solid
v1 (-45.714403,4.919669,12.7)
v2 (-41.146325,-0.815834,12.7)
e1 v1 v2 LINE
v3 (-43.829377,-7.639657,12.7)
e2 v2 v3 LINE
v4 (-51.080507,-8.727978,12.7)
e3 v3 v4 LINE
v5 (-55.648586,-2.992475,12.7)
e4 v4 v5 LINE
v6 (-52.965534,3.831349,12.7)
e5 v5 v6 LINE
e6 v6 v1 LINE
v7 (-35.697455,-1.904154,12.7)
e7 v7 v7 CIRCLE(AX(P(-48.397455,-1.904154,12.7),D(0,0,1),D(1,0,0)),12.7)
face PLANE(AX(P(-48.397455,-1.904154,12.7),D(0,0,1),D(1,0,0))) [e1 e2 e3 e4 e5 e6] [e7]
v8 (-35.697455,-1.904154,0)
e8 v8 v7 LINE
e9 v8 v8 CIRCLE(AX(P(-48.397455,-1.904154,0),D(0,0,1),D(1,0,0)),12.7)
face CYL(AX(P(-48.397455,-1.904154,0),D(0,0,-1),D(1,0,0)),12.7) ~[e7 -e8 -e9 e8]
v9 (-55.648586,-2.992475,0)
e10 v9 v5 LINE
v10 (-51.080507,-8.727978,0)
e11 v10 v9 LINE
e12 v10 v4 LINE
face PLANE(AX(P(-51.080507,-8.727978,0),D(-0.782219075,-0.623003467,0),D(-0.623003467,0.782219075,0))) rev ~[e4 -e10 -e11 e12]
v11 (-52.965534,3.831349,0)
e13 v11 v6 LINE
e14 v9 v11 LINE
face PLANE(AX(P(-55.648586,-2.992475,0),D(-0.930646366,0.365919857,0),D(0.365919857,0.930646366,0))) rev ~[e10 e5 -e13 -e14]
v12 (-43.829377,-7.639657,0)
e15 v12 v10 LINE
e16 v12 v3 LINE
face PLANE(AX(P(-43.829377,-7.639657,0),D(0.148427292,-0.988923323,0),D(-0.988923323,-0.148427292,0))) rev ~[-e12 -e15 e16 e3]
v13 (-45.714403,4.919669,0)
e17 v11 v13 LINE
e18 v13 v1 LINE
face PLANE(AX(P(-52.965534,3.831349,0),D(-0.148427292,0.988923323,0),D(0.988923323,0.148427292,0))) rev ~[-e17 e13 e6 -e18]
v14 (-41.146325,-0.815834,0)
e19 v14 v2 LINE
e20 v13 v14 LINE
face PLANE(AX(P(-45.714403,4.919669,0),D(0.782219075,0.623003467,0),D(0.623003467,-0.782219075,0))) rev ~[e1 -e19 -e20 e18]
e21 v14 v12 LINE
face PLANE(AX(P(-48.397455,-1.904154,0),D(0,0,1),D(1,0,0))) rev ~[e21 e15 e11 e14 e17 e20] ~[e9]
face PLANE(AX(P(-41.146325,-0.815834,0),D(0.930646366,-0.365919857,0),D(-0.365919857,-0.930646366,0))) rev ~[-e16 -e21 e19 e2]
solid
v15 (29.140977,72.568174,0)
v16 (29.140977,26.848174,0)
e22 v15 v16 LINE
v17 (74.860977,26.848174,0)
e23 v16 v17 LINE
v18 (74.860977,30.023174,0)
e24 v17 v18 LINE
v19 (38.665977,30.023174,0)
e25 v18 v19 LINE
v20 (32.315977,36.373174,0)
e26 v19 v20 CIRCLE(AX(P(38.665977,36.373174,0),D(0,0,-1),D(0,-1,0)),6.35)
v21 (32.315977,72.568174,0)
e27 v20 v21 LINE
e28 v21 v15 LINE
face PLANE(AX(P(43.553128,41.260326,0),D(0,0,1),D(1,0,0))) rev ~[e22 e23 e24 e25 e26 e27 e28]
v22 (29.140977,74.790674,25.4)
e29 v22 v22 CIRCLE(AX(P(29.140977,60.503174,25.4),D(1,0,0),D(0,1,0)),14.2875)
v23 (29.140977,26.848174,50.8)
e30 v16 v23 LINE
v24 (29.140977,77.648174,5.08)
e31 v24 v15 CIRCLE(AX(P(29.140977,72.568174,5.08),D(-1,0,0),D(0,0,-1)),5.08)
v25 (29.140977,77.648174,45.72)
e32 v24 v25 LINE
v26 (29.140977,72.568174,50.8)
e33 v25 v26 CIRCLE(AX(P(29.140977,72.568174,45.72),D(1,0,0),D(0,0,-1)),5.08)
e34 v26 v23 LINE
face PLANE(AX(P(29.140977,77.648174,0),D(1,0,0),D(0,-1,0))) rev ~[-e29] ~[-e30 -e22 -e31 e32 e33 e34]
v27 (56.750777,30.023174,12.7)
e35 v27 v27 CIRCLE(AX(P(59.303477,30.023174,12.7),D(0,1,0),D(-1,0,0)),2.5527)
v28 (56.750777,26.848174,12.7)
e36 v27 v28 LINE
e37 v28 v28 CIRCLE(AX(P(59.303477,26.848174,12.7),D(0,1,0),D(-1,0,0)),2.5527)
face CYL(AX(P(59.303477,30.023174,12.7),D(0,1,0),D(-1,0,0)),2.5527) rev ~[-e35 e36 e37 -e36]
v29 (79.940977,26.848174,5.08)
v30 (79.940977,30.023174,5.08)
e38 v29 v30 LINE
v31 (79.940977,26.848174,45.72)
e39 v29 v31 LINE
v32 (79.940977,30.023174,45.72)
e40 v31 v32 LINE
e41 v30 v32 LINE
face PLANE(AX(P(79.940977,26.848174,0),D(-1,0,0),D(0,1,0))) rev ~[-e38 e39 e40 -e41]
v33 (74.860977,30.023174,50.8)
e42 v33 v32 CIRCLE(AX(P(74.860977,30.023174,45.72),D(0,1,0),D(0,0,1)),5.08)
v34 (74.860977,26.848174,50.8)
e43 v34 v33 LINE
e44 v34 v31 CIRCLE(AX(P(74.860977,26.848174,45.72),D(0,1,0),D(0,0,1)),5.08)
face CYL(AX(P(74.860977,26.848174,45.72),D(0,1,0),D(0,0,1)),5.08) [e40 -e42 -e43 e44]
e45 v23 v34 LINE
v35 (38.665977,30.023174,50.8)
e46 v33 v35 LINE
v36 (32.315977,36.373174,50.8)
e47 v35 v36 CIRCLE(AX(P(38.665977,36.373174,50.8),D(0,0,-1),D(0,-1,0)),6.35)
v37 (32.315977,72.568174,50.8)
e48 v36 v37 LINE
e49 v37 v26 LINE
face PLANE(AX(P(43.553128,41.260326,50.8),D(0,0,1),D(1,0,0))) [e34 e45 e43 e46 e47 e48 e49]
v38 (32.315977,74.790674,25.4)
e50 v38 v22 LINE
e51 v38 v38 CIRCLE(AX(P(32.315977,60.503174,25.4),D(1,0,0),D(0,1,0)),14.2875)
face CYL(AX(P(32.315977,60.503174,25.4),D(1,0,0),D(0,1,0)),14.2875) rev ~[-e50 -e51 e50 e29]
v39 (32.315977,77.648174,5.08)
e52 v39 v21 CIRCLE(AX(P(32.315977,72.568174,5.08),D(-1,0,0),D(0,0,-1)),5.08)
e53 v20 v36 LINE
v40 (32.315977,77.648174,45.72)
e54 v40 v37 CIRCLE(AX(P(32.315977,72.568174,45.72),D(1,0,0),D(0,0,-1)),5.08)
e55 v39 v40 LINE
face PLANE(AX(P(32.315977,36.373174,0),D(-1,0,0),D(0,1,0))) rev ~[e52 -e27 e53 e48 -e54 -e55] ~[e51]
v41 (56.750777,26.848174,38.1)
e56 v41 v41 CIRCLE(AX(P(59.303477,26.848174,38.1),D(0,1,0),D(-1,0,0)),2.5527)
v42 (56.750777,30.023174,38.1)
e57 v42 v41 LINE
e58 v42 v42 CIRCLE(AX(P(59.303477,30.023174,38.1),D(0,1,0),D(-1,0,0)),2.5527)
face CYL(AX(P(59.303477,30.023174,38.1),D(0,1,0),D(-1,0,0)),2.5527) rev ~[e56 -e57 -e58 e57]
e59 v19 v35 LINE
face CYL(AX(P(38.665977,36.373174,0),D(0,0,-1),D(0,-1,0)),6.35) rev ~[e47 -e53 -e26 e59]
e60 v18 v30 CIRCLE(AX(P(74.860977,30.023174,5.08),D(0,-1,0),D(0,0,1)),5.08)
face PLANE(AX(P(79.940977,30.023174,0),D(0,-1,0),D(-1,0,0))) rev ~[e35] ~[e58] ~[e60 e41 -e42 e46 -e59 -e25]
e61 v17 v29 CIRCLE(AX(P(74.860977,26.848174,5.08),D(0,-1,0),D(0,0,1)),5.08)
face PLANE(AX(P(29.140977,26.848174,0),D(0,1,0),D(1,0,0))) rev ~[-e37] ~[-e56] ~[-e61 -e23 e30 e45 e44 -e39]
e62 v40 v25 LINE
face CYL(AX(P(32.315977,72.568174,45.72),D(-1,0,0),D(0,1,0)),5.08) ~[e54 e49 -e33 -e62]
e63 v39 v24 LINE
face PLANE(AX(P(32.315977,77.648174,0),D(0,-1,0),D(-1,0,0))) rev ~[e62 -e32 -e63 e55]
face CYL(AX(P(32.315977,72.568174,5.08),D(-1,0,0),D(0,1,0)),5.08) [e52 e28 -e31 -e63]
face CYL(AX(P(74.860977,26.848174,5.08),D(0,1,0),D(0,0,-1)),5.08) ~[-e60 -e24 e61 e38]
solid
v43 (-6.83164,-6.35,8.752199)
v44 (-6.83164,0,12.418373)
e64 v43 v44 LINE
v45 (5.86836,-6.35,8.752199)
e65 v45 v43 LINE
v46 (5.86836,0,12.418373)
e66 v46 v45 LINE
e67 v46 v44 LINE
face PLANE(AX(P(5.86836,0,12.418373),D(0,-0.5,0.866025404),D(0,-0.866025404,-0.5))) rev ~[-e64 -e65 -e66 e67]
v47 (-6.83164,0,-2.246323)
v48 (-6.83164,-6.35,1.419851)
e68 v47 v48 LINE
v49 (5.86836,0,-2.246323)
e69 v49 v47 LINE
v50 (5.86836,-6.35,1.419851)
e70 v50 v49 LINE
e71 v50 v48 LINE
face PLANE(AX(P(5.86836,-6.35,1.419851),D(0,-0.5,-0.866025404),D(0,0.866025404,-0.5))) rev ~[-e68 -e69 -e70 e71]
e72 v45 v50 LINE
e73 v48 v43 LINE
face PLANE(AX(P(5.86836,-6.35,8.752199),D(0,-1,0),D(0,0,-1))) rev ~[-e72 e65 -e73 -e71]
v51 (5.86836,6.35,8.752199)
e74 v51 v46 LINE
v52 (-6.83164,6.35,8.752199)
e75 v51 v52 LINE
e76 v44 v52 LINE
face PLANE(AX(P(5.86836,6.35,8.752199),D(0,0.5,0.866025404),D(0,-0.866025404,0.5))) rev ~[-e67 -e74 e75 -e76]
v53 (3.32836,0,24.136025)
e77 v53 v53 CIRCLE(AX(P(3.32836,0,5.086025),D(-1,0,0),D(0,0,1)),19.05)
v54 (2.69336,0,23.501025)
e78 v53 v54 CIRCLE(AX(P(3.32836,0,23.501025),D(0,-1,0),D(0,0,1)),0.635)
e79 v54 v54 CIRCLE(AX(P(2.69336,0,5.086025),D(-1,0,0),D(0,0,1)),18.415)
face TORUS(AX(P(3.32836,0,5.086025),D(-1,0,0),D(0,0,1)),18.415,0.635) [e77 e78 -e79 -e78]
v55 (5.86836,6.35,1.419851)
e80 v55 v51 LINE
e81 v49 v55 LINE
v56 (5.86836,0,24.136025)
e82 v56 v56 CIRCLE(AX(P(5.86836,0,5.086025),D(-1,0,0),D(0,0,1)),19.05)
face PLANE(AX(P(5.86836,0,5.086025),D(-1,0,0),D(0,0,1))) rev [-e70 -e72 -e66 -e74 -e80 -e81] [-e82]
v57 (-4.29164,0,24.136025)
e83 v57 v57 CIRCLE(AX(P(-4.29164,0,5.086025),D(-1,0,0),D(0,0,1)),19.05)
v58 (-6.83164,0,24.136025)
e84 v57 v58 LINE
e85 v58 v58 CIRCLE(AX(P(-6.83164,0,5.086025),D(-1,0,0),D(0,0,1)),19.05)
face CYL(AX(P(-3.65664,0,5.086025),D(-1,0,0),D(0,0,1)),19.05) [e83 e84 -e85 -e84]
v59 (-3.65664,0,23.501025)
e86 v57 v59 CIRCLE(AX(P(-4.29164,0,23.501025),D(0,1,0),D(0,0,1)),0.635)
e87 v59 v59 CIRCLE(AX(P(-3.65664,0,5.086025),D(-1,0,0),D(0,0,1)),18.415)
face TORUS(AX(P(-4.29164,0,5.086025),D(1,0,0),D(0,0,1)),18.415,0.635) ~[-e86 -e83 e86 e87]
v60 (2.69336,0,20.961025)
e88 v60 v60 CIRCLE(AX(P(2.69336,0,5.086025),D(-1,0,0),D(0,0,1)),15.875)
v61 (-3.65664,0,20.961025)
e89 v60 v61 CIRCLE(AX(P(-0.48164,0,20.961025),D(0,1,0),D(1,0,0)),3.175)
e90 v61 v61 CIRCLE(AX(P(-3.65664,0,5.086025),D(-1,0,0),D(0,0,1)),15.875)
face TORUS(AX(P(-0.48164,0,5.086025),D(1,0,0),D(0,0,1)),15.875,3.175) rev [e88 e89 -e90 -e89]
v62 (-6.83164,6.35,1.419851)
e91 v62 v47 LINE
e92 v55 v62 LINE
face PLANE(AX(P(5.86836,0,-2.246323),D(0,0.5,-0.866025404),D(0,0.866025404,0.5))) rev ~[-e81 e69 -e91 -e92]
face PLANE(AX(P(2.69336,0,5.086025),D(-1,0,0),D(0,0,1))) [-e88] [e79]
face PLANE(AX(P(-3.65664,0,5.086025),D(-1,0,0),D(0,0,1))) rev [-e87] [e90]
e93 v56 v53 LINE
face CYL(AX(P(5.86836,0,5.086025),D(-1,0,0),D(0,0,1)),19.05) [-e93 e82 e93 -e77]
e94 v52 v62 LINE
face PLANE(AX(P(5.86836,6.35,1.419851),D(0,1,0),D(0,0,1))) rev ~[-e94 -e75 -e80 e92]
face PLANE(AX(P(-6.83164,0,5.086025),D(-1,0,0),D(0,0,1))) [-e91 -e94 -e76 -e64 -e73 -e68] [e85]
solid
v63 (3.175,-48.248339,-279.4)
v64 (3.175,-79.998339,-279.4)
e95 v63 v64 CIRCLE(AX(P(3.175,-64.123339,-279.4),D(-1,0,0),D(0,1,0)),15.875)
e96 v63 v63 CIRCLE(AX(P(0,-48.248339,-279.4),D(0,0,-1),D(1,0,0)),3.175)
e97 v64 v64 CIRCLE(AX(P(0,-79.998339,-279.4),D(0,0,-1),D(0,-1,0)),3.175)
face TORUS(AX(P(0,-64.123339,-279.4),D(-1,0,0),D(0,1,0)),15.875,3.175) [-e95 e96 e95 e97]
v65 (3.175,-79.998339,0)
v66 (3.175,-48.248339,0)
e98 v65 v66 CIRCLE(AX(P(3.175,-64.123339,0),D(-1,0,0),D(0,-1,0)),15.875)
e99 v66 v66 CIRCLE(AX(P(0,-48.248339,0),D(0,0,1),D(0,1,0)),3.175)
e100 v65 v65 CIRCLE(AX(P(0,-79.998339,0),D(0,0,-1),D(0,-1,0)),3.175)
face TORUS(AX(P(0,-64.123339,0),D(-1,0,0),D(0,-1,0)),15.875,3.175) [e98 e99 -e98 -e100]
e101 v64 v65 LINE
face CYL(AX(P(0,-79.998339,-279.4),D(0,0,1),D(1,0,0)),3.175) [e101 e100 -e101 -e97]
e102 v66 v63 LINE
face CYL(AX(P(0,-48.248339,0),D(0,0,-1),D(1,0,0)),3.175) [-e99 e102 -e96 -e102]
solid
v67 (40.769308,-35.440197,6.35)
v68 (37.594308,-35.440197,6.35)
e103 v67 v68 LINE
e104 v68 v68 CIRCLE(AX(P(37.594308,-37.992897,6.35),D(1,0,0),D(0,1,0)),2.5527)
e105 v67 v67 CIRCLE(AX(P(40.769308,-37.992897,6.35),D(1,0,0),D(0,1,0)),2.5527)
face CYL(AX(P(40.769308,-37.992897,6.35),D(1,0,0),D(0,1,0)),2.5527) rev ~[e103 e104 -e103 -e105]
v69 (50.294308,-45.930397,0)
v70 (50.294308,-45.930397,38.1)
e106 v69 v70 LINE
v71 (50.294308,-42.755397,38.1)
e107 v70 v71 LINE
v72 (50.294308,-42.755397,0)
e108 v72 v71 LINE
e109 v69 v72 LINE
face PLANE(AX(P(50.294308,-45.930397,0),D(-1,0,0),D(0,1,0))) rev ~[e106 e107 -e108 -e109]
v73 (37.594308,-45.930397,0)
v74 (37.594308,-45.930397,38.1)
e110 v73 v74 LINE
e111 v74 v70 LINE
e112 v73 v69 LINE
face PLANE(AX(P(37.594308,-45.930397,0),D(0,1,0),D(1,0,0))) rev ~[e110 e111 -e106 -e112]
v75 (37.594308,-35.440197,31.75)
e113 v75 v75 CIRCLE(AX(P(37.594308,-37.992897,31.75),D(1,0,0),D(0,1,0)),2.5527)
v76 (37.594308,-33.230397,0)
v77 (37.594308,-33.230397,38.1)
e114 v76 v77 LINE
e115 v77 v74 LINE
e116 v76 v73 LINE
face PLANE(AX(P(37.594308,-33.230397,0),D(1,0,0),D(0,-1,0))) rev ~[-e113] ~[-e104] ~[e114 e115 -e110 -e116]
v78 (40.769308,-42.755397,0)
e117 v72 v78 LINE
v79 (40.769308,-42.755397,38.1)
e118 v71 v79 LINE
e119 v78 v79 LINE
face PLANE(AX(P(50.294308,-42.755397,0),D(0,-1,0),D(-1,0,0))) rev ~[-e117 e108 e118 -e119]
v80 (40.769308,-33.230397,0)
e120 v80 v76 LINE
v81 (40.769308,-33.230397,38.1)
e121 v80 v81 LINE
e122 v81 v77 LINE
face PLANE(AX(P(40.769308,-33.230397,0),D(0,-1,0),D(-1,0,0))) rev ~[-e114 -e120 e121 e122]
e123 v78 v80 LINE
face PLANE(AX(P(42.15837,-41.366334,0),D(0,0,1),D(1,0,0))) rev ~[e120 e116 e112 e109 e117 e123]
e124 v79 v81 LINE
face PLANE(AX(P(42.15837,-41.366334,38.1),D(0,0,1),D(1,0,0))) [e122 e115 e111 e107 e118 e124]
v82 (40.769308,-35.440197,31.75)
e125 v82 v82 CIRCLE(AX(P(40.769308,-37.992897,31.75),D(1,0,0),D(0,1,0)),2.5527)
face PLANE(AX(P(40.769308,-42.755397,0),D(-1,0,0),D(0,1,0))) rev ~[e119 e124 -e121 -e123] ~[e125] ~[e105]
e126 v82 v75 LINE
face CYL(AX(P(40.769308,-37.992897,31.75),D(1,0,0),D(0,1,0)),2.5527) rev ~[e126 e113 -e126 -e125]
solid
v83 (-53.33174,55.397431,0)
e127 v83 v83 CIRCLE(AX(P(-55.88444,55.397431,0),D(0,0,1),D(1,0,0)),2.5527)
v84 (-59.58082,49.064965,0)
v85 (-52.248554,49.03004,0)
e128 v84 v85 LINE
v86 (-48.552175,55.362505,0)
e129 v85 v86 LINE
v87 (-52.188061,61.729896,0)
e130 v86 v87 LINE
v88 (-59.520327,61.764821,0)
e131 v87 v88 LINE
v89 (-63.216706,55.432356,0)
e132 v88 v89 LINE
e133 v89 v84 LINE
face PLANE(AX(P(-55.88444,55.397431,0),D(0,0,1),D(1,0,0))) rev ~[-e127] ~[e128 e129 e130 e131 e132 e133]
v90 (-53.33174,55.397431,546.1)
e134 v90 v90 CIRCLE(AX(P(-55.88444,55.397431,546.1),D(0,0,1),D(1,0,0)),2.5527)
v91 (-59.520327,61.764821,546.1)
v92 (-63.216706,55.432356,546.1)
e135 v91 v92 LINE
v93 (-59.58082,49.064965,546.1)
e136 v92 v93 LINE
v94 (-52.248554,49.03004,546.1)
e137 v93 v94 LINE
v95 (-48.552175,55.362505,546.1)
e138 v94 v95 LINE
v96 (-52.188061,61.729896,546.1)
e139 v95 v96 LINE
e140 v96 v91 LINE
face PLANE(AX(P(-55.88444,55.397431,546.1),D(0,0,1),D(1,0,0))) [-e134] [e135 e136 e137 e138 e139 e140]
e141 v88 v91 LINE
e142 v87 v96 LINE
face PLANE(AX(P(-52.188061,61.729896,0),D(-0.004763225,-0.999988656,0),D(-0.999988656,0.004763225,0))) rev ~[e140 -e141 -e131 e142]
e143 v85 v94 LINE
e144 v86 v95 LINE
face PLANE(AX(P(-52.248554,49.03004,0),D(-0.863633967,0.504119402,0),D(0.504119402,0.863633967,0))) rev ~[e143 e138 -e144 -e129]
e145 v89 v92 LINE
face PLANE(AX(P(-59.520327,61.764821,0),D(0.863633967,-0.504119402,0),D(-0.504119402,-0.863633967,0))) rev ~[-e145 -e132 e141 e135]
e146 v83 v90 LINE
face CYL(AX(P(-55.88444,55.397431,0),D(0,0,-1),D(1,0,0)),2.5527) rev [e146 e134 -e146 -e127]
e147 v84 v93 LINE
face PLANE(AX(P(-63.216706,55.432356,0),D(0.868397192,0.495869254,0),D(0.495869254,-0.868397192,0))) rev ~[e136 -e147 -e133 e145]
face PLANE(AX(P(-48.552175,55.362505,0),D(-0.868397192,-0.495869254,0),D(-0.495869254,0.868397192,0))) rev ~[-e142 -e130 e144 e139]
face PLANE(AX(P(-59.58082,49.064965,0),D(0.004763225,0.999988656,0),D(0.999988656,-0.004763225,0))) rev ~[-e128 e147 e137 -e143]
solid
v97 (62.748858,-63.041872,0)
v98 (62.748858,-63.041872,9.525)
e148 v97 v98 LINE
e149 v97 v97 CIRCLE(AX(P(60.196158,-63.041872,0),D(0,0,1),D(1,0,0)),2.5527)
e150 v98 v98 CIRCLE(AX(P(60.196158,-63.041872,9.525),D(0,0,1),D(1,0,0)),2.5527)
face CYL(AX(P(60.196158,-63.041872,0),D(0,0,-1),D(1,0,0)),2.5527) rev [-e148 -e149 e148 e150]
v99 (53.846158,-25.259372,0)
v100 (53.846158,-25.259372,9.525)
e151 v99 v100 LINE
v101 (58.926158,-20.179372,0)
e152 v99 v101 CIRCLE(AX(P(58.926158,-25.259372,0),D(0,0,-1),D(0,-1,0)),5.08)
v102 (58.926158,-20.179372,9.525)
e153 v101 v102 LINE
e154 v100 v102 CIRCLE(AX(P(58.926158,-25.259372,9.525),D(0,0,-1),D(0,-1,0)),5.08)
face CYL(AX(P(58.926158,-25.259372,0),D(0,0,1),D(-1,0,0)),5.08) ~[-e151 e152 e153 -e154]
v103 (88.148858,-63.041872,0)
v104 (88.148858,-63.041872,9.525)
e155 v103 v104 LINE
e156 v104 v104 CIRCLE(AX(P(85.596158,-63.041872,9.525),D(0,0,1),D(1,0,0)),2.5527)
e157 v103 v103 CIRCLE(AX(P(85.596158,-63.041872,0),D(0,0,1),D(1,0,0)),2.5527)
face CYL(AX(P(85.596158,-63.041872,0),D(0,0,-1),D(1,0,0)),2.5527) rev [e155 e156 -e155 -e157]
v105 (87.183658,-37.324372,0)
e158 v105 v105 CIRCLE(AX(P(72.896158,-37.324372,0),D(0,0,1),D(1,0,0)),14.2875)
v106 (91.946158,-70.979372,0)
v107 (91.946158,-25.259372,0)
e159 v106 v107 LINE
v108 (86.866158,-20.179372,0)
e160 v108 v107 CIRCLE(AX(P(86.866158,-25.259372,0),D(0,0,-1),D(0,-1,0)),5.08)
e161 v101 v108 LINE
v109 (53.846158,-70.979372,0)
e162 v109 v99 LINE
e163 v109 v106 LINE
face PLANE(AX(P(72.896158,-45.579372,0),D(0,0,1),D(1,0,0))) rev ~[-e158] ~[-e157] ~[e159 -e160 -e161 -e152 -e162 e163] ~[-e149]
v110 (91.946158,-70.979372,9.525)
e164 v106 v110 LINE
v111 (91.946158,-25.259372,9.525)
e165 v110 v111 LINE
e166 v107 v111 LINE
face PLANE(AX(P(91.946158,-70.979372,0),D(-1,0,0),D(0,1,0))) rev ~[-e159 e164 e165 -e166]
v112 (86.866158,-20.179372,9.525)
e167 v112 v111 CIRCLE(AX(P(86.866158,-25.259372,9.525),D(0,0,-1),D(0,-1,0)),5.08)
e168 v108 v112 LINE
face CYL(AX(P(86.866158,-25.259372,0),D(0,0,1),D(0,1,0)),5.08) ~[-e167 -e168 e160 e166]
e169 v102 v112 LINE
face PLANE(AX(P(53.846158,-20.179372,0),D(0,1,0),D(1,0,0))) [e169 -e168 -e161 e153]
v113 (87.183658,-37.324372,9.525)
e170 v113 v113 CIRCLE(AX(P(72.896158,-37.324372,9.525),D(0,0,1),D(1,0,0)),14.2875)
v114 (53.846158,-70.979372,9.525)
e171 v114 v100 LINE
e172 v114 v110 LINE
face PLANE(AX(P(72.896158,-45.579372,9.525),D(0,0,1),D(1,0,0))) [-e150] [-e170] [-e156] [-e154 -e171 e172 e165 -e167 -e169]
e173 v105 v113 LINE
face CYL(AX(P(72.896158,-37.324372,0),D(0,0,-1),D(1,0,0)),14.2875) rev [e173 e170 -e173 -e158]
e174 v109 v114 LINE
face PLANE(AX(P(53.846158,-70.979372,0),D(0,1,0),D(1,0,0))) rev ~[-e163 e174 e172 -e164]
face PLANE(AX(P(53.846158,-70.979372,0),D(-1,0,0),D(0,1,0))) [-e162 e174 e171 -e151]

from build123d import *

# Parameters (mm, degrees)
F0_R      = 2.5527
F1_DEPTH  = 546.1
F5_DEPTH  = 69.0860653766
F6_R      = 0.635
F7_R      = 12.7
F8_DEPTH  = 12.7
F10_R     = 3.175
F13_DEPTH = 50.8
F15_R     = 2.5527
F16_DEPTH = 113.1975139048
F14_R     = 14.2875
F17_DEPTH = 95.533682572
F18_R     = 5.08
F20_DEPTH = 38.1
F21_R     = 2.5527
F22_DEPTH = 103.9870133122
F23_W     = 38.1
F23_H     = 50.8
F23_R     = 2.5527
F23_R_2   = 14.2875
F24_DEPTH = 9.525
F25_R     = 5.08


# Not quite as in the source:
# - a length typed as a fraction of an inch, garbled in the dataset ("3 / 203.2 mm" for 3/8 in), is restored


with BuildPart() as f1:
    # F0 (on Top) → F1 (new body)
    with BuildSketch(Plane.XY):
        Polygon((-59.5808195147, 49.0649654818), (-52.2485542758, 49.0300398551), (-48.5521751764, 55.3625050059), (-52.1880613159, 61.7298957835), (-59.5203265548, 61.7648214102), (-63.2167056542, 55.4323562593), align=None)
        with Locations((-55.8844404153, 55.3974306326)):
            Circle(F0_R, mode=Mode.SUBTRACT)
    extrude(amount=F1_DEPTH)


with BuildPart() as f3:
    # F2 (on Front) → F3 (revolve)
    with BuildSketch(Plane.XZ):
        with BuildLine():
            Line((-6.8316402776, 24.1360249974), (-6.8316402776, 5.0860249974))
            Line((-6.8316402776, 5.0860249974), (5.8683597224, 5.0860249974))
            Line((5.8683597224, 5.0860249974), (5.8683597224, 24.1360249974))
            Line((5.8683597224, 24.1360249974), (2.6933597224, 24.1360249974))
            Line((2.6933597224, 24.1360249974), (2.6933597224, 20.9610249974))
            ThreePointArc((2.6933597224, 20.9610249974), (-0.4816402776, 17.7860249974), (-3.6566402776, 20.9610249974))
            Line((-3.6566402776, 20.9610249974), (-3.6566402776, 24.1360249974))
            Line((-3.6566402776, 24.1360249974), (-6.8316402776, 24.1360249974))
        make_face()
    revolve(axis=Axis((-0.4816402776, 0, 5.0860249974), (-1, 0, 0)))

    # F4 (on face) → F5 (cut, through all)
    with BuildSketch(Plane.YZ.offset(5.8683597224)):
        Polygon((0, 12.4183734161), (-6.35, 8.7521992068), (-6.35, 1.4198507881), (0, -2.2463234213), (6.35, 1.4198507881), (6.35, 8.7521992068), align=None)
    extrude(amount=-F5_DEPTH, mode=Mode.SUBTRACT)

    # F6
    f6_edges = [f3.edges().sort_by_distance(p)[0] for p in [
        (-3.65664, 0, -13.963975),
        (2.69336, 0, -13.963975),
    ]]
    fillet(f6_edges, radius=F6_R)


with BuildPart() as f8:
    # F7 (on Top) → F8 (new body)
    with BuildSketch(Plane.XY):
        with Locations((-48.3974553645, -1.9041541964)):
            Circle(F7_R)
        Polygon((-43.8293768809, -7.6396569905), (-51.0805072459, -8.7279776067), (-55.6485857294, -2.9924748126), (-52.965533848, 3.8313485977), (-45.714403483, 4.9196692139), (-41.1463249995, -0.8158335802), align=None, mode=Mode.SUBTRACT)
    extrude(amount=F8_DEPTH)


with BuildPart() as f11:
    # F11: sweep along a path in F9
    with BuildLine(Plane.YZ) as f11_path:
        ThreePointArc((-79.9983394444, 0), (-64.1233394444, 15.875), (-48.2483394444, 0))
        Line((-48.2483394444, 0), (-48.2483394444, -279.4))
        ThreePointArc((-48.2483394444, -279.4), (-64.1233394444, -295.275), (-79.9983394444, -279.4))
        Line((-79.9983394444, -279.4), (-79.9983394444, 0))
    # F10 (on Top) → F11 (sweep)
    with BuildSketch(Plane.XY):
        with Locations((0, -79.9983394444)):
            Circle(F10_R)
    sweep(path=f11_path.line)


with BuildPart() as f13:
    # F12 (on Top) → F13 (new body)
    with BuildSketch(Plane.XY):
        with BuildLine():
            Line((32.3159769177, 77.6481743604), (29.1409769177, 77.6481743604))
            Line((29.1409769177, 77.6481743604), (29.1409769177, 26.8481743604))
            Line((29.1409769177, 26.8481743604), (79.9409769177, 26.8481743604))
            Line((79.9409769177, 26.8481743604), (79.9409769177, 30.0231743604))
            Line((79.9409769177, 30.0231743604), (38.6659769177, 30.0231743604))
            ThreePointArc((38.6659769177, 30.0231743604), (34.1758488572, 31.8830462999), (32.3159769177, 36.3731743604))
            Line((32.3159769177, 36.3731743604), (32.3159769177, 77.6481743604))
        make_face()
    extrude(amount=F13_DEPTH)

    # F15 (on face) → F16 (cut, through all)
    with BuildSketch(Plane(origin=(0, 30.0231743604, 0), x_dir=(-1, 0, 0), z_dir=(0, 1, 0))):
        with Locations((-59.3034769177, 38.1)):
            Circle(F15_R)
        with Locations((-59.3034769177, 12.7)):
            Circle(F15_R)
    extrude(amount=-F16_DEPTH, mode=Mode.SUBTRACT)

    # F14 (on face) → F17 (cut, through all)
    with BuildSketch(Plane.YZ.offset(32.3159769177)):
        with Locations((60.5031743604, 25.4)):
            Circle(F14_R)
    extrude(amount=-F17_DEPTH, mode=Mode.SUBTRACT)

    # F18
    f18_edges = [f13.edges().sort_by_distance(p)[0] for p in [
        (30.728477, 77.648174, 50.8),
        (30.728477, 77.648174, 0),
        (79.940977, 28.435674, 50.8),
        (79.940977, 28.435674, 0),
    ]]
    fillet(f18_edges, radius=F18_R)


with BuildPart() as f20:
    # F19 (on Top) → F20 (new body)
    with BuildSketch(Plane.XY):
        Polygon((40.7693076579, -33.2303968845), (37.5943076579, -33.2303968845), (37.5943076579, -45.9303968845), (50.2943076579, -45.9303968845), (50.2943076579, -42.7553968845), (40.7693076579, -42.7553968845), align=None)
    extrude(amount=F20_DEPTH)

    # F21 (on face) → F22 (cut, through all)
    with BuildSketch(Plane.YZ.offset(40.7693076579)):
        with Locations((-37.9928968845, 31.75)):
            Circle(F21_R)
        with Locations((-37.9928968845, 6.35)):
            Circle(F21_R)
    extrude(amount=-F22_DEPTH, mode=Mode.SUBTRACT)


with BuildPart() as f24:
    # F23 (on Top) → F24 (new body)
    with BuildSketch(Plane.XY):
        with Locations((72.8961580873, -45.5793716669)):
            Rectangle(F23_W, F23_H)
        with Locations((60.1961580873, -63.0418716669)):
            Circle(F23_R, mode=Mode.SUBTRACT)
        with Locations((85.5961580873, -63.0418716669)):
            Circle(F23_R, mode=Mode.SUBTRACT)
        with Locations((72.8961580873, -37.3243716669)):
            Circle(F23_R_2, mode=Mode.SUBTRACT)
    extrude(amount=F24_DEPTH)

    # F25
    f25_edges = [f24.edges().sort_by_distance(p)[0] for p in [
        (53.846158, -20.179372, 4.7625),
        (91.946158, -20.179372, 4.7625),
    ]]
    fillet(f25_edges, radius=F25_R)


solid = Compound([f1.part, f3.part, f8.part, f11.part, f13.part, f20.part, f24.part])
